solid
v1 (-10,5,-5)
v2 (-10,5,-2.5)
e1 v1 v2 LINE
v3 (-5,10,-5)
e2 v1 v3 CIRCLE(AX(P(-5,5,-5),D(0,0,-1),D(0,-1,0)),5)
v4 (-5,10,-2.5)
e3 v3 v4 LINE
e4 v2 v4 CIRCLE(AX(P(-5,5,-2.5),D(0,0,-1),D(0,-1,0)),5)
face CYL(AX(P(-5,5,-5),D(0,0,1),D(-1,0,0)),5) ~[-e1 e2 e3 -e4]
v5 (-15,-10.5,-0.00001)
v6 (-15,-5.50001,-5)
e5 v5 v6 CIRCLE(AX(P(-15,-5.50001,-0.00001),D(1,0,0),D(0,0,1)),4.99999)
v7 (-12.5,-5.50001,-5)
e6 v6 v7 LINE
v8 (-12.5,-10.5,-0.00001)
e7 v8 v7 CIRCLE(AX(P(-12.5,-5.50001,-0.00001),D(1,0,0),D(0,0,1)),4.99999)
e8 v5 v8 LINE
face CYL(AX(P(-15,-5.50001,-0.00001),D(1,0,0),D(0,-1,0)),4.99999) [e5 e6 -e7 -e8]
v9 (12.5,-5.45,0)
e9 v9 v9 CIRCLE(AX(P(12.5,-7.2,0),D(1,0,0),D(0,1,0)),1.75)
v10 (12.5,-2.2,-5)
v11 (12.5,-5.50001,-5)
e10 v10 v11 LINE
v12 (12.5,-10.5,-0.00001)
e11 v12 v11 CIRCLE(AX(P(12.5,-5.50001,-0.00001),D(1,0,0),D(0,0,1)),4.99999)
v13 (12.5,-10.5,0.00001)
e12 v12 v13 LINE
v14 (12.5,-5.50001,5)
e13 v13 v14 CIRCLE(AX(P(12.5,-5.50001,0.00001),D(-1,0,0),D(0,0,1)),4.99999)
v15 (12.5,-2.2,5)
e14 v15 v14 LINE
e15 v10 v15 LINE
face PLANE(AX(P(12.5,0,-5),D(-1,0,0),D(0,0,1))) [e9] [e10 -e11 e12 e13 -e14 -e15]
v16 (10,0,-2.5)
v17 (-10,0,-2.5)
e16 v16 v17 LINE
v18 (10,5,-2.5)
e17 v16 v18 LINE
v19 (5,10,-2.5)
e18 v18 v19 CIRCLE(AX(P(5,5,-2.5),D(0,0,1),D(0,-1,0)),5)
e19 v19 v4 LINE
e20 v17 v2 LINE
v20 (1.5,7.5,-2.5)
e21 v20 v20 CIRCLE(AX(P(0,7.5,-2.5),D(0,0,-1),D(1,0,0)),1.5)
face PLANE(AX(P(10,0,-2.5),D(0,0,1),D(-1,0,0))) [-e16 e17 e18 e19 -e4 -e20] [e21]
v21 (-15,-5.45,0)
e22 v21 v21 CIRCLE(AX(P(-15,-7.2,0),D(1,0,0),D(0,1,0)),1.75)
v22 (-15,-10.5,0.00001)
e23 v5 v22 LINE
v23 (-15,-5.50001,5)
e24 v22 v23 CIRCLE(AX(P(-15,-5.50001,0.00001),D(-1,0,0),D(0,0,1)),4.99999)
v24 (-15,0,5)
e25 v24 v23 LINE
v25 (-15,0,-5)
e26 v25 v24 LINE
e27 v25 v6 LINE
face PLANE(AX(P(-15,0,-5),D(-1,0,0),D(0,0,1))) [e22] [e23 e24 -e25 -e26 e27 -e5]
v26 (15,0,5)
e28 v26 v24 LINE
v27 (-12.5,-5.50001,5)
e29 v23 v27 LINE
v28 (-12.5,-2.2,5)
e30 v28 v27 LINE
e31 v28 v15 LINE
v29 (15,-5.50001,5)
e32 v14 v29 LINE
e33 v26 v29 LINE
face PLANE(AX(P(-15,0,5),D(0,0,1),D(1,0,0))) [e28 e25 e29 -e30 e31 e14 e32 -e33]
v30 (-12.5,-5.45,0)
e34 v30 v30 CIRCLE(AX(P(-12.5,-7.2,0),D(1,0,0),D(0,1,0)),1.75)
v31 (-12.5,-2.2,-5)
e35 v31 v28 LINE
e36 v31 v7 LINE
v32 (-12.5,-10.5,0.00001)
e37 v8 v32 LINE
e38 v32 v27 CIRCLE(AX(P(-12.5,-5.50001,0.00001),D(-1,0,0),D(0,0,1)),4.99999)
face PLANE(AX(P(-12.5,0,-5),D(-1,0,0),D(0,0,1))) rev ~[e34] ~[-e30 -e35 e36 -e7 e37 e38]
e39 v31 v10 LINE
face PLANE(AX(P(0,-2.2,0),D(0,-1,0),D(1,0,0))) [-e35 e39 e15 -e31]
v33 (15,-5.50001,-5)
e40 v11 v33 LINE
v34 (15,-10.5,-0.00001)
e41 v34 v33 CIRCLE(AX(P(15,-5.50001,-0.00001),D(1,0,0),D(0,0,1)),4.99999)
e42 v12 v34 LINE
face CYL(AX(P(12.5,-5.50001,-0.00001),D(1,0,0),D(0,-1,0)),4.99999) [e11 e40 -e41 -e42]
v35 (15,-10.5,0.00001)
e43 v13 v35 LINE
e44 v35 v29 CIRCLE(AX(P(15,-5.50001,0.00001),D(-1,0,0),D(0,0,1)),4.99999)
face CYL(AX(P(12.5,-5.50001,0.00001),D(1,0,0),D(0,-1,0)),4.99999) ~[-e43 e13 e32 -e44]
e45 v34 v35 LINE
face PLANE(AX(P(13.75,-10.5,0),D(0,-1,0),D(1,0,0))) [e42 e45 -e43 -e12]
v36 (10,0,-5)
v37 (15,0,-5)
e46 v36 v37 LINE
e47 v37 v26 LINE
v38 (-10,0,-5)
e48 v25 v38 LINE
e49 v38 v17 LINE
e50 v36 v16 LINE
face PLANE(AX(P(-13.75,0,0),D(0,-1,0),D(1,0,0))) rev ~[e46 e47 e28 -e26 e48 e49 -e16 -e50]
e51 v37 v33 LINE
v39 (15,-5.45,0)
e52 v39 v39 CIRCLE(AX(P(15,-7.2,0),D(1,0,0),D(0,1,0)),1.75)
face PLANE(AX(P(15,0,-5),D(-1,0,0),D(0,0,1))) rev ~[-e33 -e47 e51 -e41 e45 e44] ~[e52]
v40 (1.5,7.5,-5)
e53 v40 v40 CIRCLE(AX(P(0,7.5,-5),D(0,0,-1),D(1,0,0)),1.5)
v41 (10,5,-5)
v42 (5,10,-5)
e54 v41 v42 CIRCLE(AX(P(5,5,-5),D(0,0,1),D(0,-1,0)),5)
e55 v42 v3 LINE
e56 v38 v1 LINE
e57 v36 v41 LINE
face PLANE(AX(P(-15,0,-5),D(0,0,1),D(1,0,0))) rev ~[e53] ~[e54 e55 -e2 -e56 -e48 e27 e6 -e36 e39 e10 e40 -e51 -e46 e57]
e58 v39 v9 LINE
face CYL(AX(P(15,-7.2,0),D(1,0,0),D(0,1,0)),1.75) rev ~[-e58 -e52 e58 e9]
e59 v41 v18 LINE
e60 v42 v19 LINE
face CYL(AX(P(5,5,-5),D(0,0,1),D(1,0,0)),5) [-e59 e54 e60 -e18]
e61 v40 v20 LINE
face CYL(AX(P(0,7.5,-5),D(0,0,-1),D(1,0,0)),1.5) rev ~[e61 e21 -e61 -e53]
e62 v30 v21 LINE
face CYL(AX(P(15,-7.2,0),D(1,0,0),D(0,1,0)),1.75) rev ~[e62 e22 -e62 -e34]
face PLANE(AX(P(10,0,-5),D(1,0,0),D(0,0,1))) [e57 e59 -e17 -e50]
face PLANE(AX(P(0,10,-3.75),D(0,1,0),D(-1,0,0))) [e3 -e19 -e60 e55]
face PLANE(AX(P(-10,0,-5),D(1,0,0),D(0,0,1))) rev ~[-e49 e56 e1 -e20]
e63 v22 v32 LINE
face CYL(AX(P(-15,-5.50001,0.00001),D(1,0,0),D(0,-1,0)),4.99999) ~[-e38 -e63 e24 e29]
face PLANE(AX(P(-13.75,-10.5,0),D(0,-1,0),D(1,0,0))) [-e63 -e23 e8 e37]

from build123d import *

# Parameters (mm, degrees)
F0_W      = 25
F0_H      = 10
F1_DEPTH  = 2.2
F0_W_2    = 2.5
F2_DEPTH  = 10.5
F3_R      = 4.99999
F4_R      = 1.75
F5_DEPTH  = 35
F6_W      = 20
F6_H      = 2.5
F7_DEPTH  = 10
F8_R      = 5
F9_R      = 1.5
F10_DEPTH = 25


# Not quite as in the source:
# - a fillet or chamfer is up to 0.001 mm smaller than in the source, because OpenCascade refuses the exact size


with BuildPart() as f1:
    # F0 (on Front) → F1 (new body)
    with BuildSketch(Plane.XZ):
        Rectangle(F0_W, F0_H)
    extrude(amount=F1_DEPTH)

    # F0 (on Front) → F2 (join)
    with BuildSketch(Plane.XZ):
        with Locations((-13.75, 0)):
            Rectangle(F0_W_2, F0_H)
        with Locations((13.75, 0)):
            Rectangle(F0_W_2, F0_H)
    extrude(amount=F2_DEPTH)

    # F3 (radius 5 in the source; OpenCascade refuses exactly that, so slightly less here)
    f3_edges = [f1.edges().sort_by_distance(p)[0] for p in [
        (13.75, -10.5, 5),
        (13.75, -10.5, -5),
        (-13.75, -10.5, -5),
        (-13.75, -10.5, 5),
    ]]
    fillet(f3_edges, radius=F3_R)

    # F4 (on face) → F5 (cut)
    with BuildSketch(Plane.YZ.offset(15)):
        with Locations((-7.2, 0)):
            Circle(F4_R)
    extrude(amount=-F5_DEPTH, mode=Mode.SUBTRACT)

    # F6 (on face) → F7 (join)
    with BuildSketch(Plane(origin=(0, 0, 0), x_dir=(-1, 0, 0), z_dir=(0, 1, 0))):
        with Locations((0, -3.75)):
            Rectangle(F6_W, F6_H)
    extrude(amount=F7_DEPTH)

    # F8
    f8_edges = [f1.edges().sort_by_distance(p)[0] for p in [
        (10, 10, -3.75),
        (-10, 10, -3.75),
    ]]
    fillet(f8_edges, radius=F8_R)

    # F9 (on face) → F10 (cut)
    with BuildSketch(Plane(origin=(0, 0, -5), x_dir=(1, 0, 0), z_dir=(0, 0, -1))):
        with Locations((0, -7.5)):
            Circle(F9_R)
    extrude(amount=-F10_DEPTH, mode=Mode.SUBTRACT)


solid = f1.part
